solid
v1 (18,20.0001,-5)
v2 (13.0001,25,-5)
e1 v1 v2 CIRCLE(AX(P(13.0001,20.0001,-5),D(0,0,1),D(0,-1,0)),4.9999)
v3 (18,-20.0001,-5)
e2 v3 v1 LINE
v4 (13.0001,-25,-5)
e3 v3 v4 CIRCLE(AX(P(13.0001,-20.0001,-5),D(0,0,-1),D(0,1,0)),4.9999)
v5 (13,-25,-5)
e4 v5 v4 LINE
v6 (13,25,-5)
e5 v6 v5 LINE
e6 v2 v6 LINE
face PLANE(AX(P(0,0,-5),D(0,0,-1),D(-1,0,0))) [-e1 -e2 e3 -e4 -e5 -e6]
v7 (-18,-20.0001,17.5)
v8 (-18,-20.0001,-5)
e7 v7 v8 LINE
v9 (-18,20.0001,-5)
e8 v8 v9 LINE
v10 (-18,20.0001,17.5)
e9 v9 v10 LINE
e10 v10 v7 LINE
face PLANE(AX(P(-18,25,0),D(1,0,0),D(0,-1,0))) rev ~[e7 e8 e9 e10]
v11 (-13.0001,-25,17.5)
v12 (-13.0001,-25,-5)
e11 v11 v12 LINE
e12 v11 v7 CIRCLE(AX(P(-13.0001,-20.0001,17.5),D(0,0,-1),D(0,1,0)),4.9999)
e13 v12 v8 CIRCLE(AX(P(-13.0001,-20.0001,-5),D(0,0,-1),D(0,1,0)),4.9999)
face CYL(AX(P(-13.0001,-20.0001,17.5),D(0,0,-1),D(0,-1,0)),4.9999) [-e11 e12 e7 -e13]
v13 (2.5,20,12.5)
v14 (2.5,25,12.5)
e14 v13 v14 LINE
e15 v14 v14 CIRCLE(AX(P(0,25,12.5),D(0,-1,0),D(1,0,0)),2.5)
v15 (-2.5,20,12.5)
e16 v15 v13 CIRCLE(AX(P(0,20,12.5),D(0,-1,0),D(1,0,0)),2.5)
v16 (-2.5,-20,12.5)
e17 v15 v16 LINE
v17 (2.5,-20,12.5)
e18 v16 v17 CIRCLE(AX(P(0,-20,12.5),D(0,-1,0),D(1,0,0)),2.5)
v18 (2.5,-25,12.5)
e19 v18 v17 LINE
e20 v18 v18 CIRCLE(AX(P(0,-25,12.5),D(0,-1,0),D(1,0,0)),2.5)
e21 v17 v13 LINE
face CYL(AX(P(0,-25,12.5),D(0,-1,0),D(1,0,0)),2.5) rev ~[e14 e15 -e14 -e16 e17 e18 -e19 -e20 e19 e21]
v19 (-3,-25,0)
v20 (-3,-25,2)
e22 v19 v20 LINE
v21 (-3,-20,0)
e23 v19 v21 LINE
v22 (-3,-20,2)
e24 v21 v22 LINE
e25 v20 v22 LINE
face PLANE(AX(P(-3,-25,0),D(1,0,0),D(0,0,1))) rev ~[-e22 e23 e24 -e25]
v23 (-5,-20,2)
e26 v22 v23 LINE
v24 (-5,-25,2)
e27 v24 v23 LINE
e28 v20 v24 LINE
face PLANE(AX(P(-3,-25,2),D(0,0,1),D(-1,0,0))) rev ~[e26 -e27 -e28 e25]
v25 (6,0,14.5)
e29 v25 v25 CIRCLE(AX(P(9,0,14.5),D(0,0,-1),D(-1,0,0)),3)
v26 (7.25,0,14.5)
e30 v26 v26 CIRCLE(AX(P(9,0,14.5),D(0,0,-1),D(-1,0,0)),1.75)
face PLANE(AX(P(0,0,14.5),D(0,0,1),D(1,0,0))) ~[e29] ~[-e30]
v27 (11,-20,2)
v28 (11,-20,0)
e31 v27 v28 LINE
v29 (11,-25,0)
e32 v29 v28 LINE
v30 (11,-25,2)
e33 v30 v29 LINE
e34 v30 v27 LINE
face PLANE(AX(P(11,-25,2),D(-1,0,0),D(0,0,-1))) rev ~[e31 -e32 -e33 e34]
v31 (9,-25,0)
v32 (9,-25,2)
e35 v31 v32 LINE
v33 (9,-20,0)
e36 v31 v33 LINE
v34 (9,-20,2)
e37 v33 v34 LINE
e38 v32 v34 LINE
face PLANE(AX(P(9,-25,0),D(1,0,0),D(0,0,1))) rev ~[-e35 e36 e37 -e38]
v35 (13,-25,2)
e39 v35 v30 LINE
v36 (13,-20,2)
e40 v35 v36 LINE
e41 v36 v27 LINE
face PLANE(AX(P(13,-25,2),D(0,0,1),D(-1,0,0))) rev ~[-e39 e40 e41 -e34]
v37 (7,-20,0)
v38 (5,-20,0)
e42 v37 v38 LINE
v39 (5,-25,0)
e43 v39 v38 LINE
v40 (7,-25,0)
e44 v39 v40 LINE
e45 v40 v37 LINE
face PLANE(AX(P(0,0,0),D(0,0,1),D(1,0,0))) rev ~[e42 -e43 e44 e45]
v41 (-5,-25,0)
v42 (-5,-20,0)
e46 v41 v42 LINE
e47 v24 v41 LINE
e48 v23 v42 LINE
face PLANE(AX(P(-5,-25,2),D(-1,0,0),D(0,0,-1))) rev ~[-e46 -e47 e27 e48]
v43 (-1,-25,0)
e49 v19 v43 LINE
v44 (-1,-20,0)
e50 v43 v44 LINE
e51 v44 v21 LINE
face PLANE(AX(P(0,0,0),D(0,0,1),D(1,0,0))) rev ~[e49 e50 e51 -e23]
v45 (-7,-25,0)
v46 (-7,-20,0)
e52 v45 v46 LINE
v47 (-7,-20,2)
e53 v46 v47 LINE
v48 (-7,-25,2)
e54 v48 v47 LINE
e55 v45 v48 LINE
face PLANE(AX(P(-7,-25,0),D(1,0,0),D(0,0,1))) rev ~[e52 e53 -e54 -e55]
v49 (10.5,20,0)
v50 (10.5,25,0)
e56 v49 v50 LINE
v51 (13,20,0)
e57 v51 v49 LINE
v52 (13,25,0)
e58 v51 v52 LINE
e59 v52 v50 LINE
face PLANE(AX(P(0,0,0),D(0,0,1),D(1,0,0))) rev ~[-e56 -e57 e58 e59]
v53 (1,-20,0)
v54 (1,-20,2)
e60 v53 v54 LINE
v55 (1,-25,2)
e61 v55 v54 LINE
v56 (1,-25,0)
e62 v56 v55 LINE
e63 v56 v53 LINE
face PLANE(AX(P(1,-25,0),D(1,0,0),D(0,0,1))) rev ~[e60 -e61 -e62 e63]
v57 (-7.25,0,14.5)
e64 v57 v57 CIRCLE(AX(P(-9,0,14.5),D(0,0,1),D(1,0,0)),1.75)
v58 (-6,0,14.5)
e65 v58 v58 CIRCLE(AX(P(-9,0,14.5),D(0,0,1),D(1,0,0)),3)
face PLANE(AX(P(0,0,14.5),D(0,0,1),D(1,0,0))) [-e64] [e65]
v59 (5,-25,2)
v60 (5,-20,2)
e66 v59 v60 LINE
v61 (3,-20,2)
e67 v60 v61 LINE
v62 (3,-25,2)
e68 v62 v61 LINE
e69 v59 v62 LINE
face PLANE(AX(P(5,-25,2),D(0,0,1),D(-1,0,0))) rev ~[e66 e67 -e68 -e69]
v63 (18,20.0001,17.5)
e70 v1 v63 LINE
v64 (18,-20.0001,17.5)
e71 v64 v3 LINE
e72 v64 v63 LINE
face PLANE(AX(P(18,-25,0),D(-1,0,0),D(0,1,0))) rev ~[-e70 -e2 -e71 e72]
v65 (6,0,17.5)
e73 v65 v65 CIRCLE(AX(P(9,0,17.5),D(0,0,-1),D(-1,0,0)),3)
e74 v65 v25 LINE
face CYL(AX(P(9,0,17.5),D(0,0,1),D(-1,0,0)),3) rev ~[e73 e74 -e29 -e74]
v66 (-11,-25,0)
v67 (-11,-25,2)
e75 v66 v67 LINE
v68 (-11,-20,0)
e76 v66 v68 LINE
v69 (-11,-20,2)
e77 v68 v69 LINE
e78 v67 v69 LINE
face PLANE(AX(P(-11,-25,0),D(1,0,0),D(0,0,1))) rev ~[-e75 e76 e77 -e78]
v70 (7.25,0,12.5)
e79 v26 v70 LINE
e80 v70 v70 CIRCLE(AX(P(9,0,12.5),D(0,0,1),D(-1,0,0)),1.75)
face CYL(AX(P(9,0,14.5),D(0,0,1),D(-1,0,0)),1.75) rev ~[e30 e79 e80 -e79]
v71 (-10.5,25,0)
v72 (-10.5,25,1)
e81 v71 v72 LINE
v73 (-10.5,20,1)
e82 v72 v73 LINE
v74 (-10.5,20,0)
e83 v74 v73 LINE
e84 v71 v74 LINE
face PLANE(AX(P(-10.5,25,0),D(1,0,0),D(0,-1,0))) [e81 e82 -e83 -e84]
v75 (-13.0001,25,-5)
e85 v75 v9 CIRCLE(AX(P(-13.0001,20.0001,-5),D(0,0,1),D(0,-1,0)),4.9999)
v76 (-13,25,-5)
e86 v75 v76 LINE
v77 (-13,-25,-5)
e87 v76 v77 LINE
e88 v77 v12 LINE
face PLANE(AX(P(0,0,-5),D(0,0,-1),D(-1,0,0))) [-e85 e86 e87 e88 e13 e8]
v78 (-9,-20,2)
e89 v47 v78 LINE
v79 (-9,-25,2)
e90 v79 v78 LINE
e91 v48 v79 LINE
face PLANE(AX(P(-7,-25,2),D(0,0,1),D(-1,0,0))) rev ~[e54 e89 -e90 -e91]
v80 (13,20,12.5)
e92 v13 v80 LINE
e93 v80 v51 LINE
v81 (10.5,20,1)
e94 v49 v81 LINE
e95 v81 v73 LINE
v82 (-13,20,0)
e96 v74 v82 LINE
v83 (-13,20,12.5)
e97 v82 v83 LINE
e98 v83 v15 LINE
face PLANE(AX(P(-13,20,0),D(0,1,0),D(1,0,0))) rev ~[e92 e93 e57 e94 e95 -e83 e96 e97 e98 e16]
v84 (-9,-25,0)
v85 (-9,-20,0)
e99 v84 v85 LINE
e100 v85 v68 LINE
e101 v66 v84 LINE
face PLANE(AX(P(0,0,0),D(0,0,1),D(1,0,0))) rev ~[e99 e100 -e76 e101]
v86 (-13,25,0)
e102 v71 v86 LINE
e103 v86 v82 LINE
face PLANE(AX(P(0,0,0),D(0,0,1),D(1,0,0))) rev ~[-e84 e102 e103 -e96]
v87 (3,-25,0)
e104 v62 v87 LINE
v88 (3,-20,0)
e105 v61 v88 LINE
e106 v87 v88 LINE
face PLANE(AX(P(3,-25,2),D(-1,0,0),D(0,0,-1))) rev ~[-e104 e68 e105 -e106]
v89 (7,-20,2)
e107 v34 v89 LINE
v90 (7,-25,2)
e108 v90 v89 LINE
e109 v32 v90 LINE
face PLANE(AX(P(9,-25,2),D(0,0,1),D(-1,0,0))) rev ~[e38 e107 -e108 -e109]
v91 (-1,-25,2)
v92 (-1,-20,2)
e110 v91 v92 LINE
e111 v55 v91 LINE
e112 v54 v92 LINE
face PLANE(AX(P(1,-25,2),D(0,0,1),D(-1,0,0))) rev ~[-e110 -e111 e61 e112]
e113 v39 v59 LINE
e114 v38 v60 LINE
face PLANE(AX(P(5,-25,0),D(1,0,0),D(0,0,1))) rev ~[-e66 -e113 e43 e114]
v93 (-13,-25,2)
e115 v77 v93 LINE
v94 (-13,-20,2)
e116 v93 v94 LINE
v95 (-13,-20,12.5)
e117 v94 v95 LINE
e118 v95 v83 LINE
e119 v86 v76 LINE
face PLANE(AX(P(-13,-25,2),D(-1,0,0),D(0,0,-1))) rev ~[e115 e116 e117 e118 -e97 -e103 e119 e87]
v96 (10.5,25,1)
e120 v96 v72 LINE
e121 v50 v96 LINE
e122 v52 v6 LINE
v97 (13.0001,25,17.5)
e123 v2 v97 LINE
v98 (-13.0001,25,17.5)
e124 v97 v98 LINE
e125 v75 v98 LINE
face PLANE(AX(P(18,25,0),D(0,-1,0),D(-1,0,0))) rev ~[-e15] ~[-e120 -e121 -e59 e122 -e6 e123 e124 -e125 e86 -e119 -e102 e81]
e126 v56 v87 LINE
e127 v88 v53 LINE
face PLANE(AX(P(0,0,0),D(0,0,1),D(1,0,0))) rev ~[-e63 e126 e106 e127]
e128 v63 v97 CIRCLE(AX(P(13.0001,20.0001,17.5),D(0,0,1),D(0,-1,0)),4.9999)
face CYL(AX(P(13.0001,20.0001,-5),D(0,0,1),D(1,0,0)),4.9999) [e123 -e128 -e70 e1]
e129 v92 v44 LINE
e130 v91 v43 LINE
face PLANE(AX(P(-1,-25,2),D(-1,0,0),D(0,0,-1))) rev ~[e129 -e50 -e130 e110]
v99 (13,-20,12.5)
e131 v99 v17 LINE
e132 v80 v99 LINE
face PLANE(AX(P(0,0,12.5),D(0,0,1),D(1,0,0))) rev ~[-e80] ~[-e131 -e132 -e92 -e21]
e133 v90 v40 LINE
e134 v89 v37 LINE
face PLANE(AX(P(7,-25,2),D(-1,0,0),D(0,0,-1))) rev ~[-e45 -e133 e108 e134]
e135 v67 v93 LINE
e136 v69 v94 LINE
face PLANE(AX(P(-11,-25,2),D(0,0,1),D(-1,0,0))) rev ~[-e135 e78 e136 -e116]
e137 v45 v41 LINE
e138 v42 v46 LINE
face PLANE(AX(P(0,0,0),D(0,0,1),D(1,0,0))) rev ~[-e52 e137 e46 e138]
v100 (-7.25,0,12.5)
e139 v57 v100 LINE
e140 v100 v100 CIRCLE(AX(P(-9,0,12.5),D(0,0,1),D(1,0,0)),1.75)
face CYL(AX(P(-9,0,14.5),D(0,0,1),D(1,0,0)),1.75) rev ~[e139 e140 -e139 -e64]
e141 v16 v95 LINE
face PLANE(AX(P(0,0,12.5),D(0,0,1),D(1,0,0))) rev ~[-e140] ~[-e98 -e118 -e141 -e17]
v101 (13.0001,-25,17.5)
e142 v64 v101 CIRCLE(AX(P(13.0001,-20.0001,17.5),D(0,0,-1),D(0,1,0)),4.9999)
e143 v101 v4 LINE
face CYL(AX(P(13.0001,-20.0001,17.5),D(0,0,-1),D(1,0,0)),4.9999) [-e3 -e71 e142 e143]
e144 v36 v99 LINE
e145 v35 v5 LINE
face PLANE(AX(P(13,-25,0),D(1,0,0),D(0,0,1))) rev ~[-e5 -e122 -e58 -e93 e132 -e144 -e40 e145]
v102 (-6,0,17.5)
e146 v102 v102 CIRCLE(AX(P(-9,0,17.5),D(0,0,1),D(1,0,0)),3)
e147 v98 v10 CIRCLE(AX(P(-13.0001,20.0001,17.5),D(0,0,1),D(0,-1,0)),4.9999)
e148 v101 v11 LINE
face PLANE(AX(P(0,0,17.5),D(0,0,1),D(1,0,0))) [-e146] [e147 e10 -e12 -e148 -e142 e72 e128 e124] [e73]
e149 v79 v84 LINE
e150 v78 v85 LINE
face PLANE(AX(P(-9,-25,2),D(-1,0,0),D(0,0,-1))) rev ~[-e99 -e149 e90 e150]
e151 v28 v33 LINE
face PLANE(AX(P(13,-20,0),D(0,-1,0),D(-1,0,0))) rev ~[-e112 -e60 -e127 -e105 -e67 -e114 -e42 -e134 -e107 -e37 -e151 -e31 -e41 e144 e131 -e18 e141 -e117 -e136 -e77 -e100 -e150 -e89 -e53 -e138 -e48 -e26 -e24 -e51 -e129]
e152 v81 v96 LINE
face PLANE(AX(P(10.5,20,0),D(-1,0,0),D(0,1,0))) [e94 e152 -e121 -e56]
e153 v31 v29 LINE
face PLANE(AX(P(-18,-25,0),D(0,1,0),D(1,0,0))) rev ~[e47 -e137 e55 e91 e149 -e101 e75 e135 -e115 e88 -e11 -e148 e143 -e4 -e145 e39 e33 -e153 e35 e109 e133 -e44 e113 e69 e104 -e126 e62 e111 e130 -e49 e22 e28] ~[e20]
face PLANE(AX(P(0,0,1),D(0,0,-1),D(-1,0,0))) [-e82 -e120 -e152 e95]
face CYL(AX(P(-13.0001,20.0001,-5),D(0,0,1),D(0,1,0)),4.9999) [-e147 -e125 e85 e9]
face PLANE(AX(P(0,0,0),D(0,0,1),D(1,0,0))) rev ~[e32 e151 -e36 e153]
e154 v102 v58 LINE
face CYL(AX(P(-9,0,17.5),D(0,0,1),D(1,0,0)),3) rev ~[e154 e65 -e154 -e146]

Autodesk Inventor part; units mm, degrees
ref_plane "YZ Plane" through (0, 0, 0) normal (1, 0, 0) x (0, 1, 0)
ref_plane "XZ Plane" through (0, 0, 0) normal (0, 1, 0) x (-1, 0, 0)
ref_plane "XY Plane" through (0, 0, 0) normal (0, 0, 1) x (1, 0, 0)
sketch "Sketch1" plane through (0, 0, 0) normal (0, 0, 1) x (1, 0, 0)
  line L0 (-13, 20) -> (13, 20)
  line L1 (13, 20) -> (13, -20)
  line L2 (13, -20) -> (-13, -20)
  line L3 (-13, -20) -> (-13, 20)
  line L4 (18, 25) -> (-18, 25)
  line L5 (-18, 25) -> (-18, -25)
  line L6 (-18, -25) -> (18, -25)
  line L7 (18, -25) -> (18, 25)
  point P0 (0, 0)
  point P1 (-13, 0)
  point P2 (0, 20)
  dimension "d0" = 26
  dimension "d1" = 40
  dimension "d2" = 5
extrude "Extrusion1" add sketch "Sketch1" along normal blind 12.5
sketch "Sketch3" plane through (0, 0, 12.5) normal (0, 0, 1) x (1, 0, 0)
  line L0 (-2.5, -25) -> (-2.5, -20) projected
  line L1 (13, -20) -> (-13, -20) projected
  line L2 (-13, -20) -> (-13, 20) projected
  line L3 (-13, 20) -> (13, 20) projected
  line L4 (-2.5, 20) -> (-2.5, 25) projected
  line L5 (18, 25) -> (-18, 25) projected
  line L6 (-18, 25) -> (-18, -25) projected
  line L7 (-18, -25) -> (18, -25) projected
  line L8 (-18, -25) -> (18, -25) projected
  line L9 (18, -25) -> (18, 25) projected
  line L10 (18, 25) -> (-18, 25) projected
  line L11 (-13, 20) -> (13, 20) projected
  line L12 (13, 20) -> (13, -20) projected
  line L13 (13, -20) -> (-13, -20) projected
  line L14 (-13, -20) -> (-13, 20) projected
  line L15 (-18, 25) -> (-18, -25) projected
  point P0 (0, 0)
extrude "Extrusion3" add sketch "Sketch3" along normal blind 5
sketch "Sketch4" plane through (0, 0, 0) normal (0, 0, -1) x (-1, 0, 0)
  line L0 (-13, 20) -> (13, 20) projected
  line L1 (-18, 25) -> (18, 25) projected
  line L2 (-10.5, 25) -> (10.5, 25)
  line L3 (10.5, 25) -> (10.5, 20)
  line L4 (10.5, 20) -> (-10.5, 20)
  line L5 (-10.5, 20) -> (-10.5, 25)
  point P0 (0, 0)
  point P1 (0, 25)
  point P2 (0, 25)
  dimension "d11" = 21
extrude "Extrusion4" cut sketch "Sketch4" against normal blind 1
sketch "Sketch5" plane through (-18, -25, 0) normal (0, -1, 0) x (1, 0, 0)
  line L0 (0, 0) -> (36, 0) projected
  line L1 (17, 0) -> (19, 0)
  line L2 (19, 0) -> (19, 2)
  line L3 (19, 2) -> (17, 2)
  line L4 (17, 2) -> (17, 0)
  point P0 (18, 0)
  point P1 (18, 0)
  dimension "d15" = 2
extrude "Extrusion5" cut sketch "Sketch5" against normal up to surface (45 mm away)
pattern_linear "Rectangular Pattern1" count 7 spacing 4 along (1, 0, 0) of "Extrusion5" first direction both ways yes
sketch "Sketch6" plane through (13, -25, 0) normal (0, -1, 0) x (1, 0, 0)
  circle A0 centre (-13, 12.5) radius 2.5
  point P0 (-13, 0)
  dimension "d22" = 12.5
  dimension "d23" = 5
extrude "Extrusion6" cut sketch "Sketch6" against normal through all
sketch "Sketch7" plane through (0, 0, 0) normal (0, 0, -1) x (-1, 0, 0)
  line L0 (-13, -25) -> (-13, 20) projected
  line L1 (-13, 20) -> (-10.5, 20) projected
  line L2 (-10.5, 20) -> (-10.5, 25) projected
  line L3 (-18, 25) -> (-10.5, 25) projected
  line L4 (-18, -25) -> (-18, 25) projected
  line L5 (-13, -25) -> (-18, -25) projected
  line L6 (-18, 25) -> (-13, 25)
  line L7 (-13, 25) -> (-13, -25)
  line L8 (-13, -25) -> (-18, -25)
  line L9 (-18, -25) -> (-18, 25)
  line L10 (13, -25) -> (18, -25)
  line L11 (18, -25) -> (18, 25)
  line L12 (18, 25) -> (13, 25)
  line L13 (13, 25) -> (13, -25)
  line L14 (-18, 25) -> (-10.5, 25) projected
  point P0 (0, 0)
extrude "Extrusion7" add sketch "Sketch7" along normal blind 5 contours L5 L4 L3 L7 L0 | L13 L12 L11 L10
fillet "Fillet3" radius 5 4 edges at (18, 25, 6.25) (18, -25, 6.25) (-18, -25, 6.25) (-18, 25, 6.25)
sketch "Sketch8" plane through (0, 0, 17.5) normal (0, 0, 1) x (1, 0, 0)
  circle A0 centre (-9, 0) radius 3
  point P0 (0, 0)
  dimension "d31" = 6
  dimension "d34" = 9
extrude "Extrusion8" cut sketch "Sketch8" against normal blind 3
sketch "Sketch9" plane through (-9, 0, 14.5) normal (0, 0, 1) x (1, 0, 0)
  circle A0 centre (0, 0) radius 3 projected
  circle A1 centre (0, 0) radius 1.75
  point P0 (9, 0)
  dimension "d37" = 3.5
extrude "Extrusion9" cut sketch "Sketch9" against normal through all contours A1
mirror "Mirror1" about plane through (0, 0, 0) normal (1, 0, 0) of "Extrusion8", "Extrusion9"
properties part number "wire block"
